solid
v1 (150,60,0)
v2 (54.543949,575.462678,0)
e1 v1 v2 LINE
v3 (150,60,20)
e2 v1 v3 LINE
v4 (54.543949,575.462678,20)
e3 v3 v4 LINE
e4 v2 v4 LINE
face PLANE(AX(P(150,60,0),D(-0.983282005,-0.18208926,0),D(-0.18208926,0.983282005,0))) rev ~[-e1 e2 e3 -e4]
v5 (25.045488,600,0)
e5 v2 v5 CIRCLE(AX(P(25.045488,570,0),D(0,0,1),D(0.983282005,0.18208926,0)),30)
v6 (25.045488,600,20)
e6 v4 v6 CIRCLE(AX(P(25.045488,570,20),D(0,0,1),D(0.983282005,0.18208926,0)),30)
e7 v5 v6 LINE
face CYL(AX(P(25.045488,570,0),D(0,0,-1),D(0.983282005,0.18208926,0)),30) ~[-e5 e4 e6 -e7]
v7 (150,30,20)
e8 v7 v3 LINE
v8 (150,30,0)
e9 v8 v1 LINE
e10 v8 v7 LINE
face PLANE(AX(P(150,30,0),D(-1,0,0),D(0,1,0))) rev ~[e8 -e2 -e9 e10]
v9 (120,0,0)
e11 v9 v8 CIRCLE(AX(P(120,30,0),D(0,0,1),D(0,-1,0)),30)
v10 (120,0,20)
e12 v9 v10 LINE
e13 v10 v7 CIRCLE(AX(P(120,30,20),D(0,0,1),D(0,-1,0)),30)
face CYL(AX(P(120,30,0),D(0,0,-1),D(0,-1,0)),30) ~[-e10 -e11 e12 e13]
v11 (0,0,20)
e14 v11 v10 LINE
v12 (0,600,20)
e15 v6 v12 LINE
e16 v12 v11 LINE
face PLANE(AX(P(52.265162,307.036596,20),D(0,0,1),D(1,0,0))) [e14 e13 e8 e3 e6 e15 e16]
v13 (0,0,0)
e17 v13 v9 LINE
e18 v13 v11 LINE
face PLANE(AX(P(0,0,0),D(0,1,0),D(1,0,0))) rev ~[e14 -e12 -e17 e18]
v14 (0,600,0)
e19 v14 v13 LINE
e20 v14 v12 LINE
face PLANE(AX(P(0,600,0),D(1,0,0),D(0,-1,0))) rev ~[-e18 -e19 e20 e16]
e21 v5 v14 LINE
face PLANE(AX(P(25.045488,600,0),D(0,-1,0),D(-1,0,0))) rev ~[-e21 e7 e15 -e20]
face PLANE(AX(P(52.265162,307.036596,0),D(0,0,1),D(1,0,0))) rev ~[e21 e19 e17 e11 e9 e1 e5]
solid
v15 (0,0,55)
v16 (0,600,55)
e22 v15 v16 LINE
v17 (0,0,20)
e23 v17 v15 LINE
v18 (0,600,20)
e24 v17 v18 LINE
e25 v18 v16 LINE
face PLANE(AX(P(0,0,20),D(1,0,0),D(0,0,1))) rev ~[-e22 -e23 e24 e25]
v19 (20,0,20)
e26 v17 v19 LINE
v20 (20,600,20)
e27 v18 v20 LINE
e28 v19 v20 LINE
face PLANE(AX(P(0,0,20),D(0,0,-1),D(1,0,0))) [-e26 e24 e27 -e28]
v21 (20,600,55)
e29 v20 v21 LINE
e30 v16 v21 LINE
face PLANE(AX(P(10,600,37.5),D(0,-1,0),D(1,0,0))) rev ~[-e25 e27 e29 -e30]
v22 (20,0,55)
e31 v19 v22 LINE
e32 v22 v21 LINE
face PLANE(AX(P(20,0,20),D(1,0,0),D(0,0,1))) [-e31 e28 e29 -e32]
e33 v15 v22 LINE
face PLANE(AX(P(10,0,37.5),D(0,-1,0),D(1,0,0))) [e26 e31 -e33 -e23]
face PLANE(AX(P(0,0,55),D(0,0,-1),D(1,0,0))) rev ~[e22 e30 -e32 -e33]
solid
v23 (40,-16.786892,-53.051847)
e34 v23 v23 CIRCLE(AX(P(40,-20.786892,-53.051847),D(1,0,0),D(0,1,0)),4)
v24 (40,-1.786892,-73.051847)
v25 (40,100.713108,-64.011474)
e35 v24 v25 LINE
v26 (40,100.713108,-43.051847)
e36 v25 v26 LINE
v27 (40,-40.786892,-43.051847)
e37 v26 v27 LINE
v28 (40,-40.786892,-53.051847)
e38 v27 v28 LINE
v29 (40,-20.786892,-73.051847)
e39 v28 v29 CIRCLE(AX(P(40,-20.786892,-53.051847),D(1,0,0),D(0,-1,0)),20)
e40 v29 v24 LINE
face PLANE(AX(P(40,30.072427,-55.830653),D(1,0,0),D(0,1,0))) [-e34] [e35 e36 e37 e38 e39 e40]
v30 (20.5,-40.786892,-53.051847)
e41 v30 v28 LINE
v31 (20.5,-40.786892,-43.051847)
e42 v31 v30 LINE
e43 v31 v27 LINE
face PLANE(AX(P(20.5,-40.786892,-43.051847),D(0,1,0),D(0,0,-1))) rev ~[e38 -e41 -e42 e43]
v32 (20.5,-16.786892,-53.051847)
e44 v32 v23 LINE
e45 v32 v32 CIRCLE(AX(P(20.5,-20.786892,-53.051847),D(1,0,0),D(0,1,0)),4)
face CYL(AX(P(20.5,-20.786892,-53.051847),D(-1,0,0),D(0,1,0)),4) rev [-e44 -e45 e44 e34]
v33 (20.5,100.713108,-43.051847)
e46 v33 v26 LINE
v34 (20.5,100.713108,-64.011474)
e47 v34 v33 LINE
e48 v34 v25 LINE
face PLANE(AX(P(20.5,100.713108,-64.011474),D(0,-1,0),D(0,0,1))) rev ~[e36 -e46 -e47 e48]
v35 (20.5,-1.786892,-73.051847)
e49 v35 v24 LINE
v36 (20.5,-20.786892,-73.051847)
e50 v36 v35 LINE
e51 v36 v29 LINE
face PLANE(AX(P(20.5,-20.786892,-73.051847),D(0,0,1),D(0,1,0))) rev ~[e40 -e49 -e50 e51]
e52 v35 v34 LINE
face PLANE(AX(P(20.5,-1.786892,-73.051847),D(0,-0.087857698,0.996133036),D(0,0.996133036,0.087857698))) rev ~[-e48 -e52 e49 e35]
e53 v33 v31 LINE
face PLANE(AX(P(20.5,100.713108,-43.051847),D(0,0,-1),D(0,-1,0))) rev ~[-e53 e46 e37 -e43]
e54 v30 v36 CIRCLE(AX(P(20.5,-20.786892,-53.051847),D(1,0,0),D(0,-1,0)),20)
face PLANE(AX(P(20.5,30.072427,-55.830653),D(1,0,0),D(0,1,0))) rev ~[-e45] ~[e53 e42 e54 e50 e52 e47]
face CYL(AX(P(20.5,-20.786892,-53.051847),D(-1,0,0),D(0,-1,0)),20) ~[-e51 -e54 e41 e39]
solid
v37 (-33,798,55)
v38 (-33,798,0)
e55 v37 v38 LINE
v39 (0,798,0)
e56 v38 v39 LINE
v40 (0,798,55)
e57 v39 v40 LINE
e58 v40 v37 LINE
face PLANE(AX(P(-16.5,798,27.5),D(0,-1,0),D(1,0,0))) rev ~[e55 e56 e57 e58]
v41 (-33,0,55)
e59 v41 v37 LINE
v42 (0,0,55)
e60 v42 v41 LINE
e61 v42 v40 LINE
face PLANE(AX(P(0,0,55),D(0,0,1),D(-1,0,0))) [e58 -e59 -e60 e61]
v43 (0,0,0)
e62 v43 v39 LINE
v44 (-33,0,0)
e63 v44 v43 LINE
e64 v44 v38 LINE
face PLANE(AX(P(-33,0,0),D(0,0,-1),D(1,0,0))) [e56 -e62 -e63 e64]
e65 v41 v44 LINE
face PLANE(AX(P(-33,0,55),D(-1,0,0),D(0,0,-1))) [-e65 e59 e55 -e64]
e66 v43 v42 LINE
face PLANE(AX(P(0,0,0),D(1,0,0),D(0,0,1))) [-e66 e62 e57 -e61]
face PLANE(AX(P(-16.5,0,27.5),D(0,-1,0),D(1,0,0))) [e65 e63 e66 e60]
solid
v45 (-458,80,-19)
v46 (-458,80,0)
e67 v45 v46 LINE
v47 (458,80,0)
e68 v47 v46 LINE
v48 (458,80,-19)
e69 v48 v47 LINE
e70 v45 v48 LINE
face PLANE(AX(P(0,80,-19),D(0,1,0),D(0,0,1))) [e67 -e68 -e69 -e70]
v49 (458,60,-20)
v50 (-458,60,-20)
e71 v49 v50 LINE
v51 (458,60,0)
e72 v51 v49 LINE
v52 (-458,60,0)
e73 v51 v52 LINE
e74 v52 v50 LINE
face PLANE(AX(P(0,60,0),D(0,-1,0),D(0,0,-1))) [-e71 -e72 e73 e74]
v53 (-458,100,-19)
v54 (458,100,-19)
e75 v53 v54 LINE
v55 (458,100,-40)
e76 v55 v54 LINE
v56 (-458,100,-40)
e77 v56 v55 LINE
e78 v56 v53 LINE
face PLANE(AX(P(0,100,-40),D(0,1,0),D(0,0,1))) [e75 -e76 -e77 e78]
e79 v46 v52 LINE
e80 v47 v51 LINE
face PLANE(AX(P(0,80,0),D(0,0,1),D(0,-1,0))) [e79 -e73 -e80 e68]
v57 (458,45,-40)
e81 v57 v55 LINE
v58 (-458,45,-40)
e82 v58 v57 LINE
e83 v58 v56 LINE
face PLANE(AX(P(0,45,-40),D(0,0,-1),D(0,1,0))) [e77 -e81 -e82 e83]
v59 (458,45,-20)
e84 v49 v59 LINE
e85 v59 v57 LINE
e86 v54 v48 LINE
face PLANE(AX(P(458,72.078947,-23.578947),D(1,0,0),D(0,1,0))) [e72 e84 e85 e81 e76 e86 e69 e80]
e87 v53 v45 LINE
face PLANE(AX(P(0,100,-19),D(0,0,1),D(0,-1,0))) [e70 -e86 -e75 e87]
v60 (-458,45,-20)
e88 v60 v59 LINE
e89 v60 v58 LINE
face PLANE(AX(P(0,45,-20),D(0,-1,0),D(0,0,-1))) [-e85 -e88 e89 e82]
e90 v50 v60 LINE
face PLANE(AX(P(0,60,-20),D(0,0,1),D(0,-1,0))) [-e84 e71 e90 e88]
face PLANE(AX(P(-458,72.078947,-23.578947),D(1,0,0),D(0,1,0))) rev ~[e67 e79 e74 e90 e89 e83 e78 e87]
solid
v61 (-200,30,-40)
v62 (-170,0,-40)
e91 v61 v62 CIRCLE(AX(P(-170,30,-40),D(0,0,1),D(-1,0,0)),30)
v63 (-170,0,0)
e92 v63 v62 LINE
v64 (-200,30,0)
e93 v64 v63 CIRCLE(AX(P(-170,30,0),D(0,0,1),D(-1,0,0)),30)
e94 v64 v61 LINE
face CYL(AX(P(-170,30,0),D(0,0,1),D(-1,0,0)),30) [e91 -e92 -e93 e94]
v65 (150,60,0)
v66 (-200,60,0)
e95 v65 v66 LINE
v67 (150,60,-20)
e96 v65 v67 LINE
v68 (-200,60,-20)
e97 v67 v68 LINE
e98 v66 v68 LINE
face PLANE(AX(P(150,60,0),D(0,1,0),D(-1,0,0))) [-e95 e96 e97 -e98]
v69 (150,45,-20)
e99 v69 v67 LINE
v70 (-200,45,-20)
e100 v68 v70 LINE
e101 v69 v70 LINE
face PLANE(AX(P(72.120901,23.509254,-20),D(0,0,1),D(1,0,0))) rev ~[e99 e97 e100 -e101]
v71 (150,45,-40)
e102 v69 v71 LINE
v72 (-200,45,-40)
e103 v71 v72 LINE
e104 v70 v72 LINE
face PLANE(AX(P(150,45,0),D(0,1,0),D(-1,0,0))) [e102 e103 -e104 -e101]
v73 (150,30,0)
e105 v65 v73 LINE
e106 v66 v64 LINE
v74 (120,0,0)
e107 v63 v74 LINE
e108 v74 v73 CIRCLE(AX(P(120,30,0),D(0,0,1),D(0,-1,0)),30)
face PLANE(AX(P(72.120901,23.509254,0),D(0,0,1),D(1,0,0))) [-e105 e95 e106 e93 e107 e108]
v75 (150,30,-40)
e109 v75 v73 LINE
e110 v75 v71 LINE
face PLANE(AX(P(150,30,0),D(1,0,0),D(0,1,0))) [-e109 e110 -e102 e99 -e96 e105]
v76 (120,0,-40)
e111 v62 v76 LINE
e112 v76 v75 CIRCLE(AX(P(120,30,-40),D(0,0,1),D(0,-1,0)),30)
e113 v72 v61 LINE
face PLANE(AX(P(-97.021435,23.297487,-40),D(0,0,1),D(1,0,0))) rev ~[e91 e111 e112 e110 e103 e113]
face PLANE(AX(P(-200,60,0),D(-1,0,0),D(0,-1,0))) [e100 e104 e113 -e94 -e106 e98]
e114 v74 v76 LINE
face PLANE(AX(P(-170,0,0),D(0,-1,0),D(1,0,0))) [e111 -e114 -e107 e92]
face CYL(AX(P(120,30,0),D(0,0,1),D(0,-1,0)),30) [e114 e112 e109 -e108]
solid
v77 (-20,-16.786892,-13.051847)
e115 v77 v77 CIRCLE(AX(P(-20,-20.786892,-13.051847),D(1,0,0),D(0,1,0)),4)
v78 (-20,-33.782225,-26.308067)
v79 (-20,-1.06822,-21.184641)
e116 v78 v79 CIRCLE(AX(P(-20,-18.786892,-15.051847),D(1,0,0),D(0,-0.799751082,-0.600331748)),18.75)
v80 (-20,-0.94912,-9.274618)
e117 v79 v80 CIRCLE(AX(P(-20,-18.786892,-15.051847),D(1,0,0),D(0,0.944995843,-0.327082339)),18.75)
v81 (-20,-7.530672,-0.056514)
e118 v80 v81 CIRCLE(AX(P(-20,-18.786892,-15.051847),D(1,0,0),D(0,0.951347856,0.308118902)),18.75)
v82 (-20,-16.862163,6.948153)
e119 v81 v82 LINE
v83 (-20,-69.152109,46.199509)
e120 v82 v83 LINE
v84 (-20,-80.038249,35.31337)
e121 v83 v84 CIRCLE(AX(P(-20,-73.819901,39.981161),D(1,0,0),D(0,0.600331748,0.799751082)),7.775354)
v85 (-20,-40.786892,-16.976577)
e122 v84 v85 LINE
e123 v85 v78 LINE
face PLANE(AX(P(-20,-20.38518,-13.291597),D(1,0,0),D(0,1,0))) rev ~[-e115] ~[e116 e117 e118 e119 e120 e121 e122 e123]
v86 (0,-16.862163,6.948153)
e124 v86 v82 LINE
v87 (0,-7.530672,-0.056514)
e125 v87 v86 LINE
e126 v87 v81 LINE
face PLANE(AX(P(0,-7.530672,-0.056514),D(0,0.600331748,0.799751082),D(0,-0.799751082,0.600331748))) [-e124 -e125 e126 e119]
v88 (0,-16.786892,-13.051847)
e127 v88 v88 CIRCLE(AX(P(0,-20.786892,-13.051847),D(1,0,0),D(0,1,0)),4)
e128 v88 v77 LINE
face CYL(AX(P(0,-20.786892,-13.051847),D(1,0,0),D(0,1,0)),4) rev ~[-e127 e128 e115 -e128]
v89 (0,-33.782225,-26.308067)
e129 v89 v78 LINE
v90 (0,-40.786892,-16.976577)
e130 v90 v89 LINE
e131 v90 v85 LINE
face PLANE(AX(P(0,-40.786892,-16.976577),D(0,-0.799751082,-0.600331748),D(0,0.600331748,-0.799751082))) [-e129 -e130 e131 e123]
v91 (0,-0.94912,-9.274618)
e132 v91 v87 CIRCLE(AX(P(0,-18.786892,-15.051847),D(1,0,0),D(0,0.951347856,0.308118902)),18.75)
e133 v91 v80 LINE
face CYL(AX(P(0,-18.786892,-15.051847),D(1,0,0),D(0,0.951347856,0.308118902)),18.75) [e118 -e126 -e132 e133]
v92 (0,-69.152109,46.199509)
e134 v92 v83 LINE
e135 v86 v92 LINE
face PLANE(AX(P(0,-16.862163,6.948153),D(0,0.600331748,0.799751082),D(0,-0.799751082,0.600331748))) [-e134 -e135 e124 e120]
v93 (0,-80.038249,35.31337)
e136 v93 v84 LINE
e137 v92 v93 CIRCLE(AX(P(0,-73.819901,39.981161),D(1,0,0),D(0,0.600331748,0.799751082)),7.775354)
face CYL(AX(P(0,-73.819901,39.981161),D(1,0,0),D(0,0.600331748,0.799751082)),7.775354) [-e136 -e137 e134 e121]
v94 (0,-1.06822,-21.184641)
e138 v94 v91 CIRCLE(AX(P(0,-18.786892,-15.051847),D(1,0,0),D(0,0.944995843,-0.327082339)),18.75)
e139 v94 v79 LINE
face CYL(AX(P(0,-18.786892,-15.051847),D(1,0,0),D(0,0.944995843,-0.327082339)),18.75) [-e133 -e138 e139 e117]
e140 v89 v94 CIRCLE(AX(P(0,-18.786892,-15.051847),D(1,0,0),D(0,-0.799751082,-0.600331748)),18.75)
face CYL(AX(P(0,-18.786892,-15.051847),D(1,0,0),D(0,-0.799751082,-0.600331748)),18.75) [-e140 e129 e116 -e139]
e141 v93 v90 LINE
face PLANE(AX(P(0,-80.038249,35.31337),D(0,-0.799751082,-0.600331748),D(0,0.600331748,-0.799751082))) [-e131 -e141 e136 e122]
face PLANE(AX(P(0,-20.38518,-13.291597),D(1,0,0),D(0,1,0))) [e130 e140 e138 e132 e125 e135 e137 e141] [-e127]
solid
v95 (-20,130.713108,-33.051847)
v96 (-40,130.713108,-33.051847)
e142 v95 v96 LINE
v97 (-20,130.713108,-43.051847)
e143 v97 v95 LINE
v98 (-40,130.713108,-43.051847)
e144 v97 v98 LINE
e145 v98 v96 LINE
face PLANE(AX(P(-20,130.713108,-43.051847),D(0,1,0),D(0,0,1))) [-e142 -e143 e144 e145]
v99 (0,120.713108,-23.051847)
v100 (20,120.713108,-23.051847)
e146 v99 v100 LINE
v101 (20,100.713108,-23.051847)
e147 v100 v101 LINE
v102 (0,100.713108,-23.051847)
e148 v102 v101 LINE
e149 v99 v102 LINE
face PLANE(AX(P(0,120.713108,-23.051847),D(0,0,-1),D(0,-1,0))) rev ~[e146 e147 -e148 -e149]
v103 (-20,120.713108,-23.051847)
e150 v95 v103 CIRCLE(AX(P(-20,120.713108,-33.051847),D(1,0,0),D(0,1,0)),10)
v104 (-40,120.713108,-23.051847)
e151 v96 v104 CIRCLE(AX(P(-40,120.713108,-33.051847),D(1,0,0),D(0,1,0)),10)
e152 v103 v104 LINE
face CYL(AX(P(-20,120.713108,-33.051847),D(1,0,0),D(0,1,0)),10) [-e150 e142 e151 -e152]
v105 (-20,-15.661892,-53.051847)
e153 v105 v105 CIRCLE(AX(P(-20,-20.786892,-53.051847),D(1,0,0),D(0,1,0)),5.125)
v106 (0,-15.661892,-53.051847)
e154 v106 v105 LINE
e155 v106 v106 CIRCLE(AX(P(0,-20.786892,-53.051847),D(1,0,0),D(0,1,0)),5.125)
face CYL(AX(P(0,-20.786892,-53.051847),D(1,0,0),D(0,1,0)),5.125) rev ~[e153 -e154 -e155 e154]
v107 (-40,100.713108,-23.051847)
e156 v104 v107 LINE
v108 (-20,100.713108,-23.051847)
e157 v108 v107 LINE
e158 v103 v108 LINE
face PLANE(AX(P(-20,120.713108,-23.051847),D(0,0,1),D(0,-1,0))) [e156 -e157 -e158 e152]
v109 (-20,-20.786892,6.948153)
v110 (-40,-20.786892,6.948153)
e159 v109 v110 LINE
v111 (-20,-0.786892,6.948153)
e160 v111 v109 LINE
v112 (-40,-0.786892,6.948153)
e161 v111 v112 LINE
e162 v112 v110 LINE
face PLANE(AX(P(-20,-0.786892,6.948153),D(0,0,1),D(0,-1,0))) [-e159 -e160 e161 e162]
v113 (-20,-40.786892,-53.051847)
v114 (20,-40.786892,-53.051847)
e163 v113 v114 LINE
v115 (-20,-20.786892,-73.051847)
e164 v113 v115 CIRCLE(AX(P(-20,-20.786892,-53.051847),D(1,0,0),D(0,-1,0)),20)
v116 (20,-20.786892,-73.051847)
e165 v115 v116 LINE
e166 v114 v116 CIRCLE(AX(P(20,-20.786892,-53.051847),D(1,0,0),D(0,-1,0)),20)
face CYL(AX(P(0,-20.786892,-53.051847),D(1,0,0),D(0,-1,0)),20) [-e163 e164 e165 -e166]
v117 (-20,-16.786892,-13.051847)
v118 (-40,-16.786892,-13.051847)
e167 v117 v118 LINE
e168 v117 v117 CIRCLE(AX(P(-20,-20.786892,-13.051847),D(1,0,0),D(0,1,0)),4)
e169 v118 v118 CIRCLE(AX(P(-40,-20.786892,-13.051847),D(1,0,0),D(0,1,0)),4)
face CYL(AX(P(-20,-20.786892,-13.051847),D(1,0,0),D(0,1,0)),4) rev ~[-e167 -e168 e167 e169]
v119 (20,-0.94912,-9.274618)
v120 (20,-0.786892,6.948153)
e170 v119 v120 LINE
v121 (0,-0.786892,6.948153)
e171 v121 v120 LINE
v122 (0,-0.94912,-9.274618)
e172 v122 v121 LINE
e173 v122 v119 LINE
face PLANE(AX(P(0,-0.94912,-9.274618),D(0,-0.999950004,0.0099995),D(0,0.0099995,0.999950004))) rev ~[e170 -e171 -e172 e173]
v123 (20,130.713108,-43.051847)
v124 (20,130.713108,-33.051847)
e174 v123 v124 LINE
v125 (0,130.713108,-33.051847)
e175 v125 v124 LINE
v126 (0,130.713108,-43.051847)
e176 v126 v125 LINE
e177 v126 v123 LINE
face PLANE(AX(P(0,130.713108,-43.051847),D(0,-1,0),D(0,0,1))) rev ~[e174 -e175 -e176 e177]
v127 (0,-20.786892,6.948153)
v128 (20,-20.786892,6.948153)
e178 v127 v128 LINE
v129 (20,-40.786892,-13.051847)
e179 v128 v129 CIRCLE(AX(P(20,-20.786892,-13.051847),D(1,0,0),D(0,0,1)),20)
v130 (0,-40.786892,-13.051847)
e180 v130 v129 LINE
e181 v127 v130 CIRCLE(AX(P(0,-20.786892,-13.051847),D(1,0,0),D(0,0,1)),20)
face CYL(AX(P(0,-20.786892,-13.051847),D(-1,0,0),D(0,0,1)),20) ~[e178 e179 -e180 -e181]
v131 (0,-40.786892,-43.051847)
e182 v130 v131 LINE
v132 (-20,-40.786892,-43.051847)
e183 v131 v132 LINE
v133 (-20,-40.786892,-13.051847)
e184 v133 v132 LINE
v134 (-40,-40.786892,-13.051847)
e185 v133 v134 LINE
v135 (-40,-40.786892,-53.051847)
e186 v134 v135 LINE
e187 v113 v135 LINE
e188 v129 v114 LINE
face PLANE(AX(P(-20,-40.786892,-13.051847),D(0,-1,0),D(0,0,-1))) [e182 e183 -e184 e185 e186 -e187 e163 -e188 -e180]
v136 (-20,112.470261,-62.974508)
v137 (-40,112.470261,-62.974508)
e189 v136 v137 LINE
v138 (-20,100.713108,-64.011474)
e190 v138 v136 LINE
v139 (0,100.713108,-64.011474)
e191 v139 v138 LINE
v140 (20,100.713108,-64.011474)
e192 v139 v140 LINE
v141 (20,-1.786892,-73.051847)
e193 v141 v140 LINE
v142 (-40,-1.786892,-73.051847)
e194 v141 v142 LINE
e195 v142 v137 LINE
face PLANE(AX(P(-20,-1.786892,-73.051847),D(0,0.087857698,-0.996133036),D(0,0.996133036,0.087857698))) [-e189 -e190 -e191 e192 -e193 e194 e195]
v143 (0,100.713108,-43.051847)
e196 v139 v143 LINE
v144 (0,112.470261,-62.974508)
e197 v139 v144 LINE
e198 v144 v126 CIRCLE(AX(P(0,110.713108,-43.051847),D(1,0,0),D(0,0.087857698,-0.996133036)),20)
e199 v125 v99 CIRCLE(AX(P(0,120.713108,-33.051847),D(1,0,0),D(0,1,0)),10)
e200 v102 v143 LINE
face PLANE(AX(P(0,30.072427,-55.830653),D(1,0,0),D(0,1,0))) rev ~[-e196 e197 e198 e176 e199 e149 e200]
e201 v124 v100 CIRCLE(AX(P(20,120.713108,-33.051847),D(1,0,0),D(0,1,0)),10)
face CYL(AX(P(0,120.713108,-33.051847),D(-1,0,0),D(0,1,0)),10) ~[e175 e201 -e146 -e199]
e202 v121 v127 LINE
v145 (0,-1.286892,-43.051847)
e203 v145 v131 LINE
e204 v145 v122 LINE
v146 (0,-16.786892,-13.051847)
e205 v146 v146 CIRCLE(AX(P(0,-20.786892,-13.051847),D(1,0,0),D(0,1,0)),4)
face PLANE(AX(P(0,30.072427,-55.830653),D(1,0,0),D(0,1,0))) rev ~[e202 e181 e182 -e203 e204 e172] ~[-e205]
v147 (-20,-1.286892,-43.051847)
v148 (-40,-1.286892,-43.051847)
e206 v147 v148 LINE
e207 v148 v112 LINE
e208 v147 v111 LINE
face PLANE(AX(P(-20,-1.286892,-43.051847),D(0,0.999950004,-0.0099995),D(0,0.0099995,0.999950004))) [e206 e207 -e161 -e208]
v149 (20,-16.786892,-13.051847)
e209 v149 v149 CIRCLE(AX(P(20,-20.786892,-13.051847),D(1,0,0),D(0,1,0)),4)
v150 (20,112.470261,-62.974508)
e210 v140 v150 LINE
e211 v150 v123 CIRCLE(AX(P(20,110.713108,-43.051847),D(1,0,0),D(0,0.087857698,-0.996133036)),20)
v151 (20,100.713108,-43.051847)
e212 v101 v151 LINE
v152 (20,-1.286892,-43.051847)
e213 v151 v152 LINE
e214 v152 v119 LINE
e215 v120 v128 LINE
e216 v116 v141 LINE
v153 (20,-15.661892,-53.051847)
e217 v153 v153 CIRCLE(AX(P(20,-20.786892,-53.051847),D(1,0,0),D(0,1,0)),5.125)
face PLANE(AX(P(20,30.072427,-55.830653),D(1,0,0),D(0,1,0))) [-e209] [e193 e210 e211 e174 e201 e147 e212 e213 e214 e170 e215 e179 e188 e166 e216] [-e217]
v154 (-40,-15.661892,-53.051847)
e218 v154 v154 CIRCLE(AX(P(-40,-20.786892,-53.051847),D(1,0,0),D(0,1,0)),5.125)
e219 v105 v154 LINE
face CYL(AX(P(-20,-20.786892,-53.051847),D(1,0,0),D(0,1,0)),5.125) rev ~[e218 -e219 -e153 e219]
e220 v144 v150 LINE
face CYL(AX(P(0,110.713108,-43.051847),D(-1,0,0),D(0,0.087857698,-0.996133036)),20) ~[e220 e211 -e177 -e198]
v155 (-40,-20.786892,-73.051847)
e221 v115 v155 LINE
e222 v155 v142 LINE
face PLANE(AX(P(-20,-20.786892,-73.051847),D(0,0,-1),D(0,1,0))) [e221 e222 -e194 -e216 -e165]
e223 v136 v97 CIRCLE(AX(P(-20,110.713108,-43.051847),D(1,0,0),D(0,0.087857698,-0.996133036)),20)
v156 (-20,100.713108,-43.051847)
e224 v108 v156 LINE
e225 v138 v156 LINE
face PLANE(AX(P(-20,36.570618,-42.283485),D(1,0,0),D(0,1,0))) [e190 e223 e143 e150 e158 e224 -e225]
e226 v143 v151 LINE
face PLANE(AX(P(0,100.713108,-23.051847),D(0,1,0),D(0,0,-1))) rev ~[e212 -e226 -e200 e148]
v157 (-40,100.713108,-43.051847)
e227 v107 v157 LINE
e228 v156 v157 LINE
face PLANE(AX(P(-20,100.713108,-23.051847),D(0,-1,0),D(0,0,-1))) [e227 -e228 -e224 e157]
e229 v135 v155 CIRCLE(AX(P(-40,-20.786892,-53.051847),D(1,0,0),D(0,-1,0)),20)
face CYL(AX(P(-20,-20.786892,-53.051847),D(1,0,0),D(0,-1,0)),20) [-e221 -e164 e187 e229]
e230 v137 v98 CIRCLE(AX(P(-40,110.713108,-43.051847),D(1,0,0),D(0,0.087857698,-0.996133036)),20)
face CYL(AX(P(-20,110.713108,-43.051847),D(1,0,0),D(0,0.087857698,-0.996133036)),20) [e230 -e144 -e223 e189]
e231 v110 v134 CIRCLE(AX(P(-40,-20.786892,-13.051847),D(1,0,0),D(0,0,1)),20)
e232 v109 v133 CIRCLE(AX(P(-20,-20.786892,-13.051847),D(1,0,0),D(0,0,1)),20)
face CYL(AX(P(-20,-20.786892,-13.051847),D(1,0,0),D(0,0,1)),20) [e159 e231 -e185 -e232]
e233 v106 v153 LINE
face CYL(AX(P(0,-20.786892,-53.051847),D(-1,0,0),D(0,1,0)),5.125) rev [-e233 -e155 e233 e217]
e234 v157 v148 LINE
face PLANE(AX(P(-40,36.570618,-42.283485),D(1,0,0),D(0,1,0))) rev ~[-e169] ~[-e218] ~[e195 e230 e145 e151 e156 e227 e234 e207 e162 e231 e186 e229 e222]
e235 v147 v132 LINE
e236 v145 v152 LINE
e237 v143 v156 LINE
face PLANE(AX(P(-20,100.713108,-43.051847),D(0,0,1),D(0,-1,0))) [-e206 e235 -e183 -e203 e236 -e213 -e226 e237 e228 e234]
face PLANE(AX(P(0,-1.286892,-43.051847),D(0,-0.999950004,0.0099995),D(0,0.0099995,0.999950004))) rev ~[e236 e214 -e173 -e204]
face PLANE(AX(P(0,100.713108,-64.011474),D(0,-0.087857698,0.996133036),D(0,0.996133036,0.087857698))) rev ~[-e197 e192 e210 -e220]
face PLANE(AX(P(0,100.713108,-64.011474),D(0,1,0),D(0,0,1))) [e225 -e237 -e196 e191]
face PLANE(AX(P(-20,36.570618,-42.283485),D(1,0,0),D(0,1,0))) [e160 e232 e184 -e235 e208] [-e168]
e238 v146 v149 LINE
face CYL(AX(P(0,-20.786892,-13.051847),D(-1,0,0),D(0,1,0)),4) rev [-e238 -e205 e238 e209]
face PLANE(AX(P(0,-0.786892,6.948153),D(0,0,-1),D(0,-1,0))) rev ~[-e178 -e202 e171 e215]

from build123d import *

# Parameters (mm, degrees)
F1_DEPTH      = 798
F2_W          = 150
F2_H          = 15
F3_DEPTH      = 20
F0_W          = 20
F0_H          = 35
F4_DEPTH      = 600
F2_W_2        = 200
F5_DEPTH      = 20
F6_DEPTH      = 40
F8_DEPTH      = 458
F8_DEPTH_BACK = 458
F7_R          = 5.125
F7_R_2        = 4
F9_DEPTH      = 20
F10_DEPTH     = 20
F11_START     = -40
F9_FACE_R     = 5.125
F9_FACE_R_2   = 4
F11_DEPTH     = 20
F12_DEPTH     = 20
F13_START     = 20.5
F13_DEPTH     = 19.5


with BuildPart() as f1:
    # F0 (on Front) → F1 (new body)
    with BuildSketch(Plane.XZ):
        Polygon((-33, 0), (0, 0), (0, 20), (0, 55), (-33, 55), align=None)
    extrude(amount=-F1_DEPTH)


with BuildPart() as f3:
    # F2 (on Top) → F3 (new body)
    with BuildSketch(Plane.XY):
        with BuildLine():
            Line((0, 600), (0, 60))
            Line((0, 60), (150, 60))
            Line((150, 60), (54.5439485545, 575.4626778055))
            ThreePointArc((54.5439485545, 575.4626778055), (44.2303739381, 593.0638281099), (25.045488405, 600))
            Line((25.045488405, 600), (0, 600))
        make_face()
        with BuildLine():
            Line((0, 45), (0, 0))
            Line((0, 0), (120, 0))
            ThreePointArc((120, 0), (141.2132034356, 8.7867965644), (150, 30))
            Line((150, 30), (150, 45))
            Line((150, 45), (0, 45))
        make_face()
        with Locations((75, 52.5)):
            Rectangle(F2_W, F2_H)
    extrude(amount=F3_DEPTH)


with BuildPart() as f4:
    # F0 (on Front) → F4 (new body, through all)
    with BuildSketch(Plane.XZ):
        with Locations((10, 37.5)):
            Rectangle(F0_W, F0_H)
    extrude(amount=-F4_DEPTH)


with BuildPart() as f5:
    # F2 (on Top) → F5 (new body)
    with BuildSketch(Plane.XY):
        with BuildLine():
            Line((0, 45), (0, 0))
            Line((0, 0), (120, 0))
            ThreePointArc((120, 0), (141.2132034356, 8.7867965644), (150, 30))
            Line((150, 30), (150, 45))
            Line((150, 45), (0, 45))
        make_face()
        with BuildLine():
            Line((-170, 0), (0, 0))
            Line((0, 0), (0, 45))
            Line((0, 45), (-200, 45))
            Line((-200, 45), (-200, 30))
            ThreePointArc((-200, 30), (-191.2132034356, 8.7867965644), (-170, 0))
        make_face()
        with Locations((-100, 52.5)):
            Rectangle(F2_W_2, F2_H)
        with Locations((75, 52.5)):
            Rectangle(F2_W, F2_H)
    extrude(amount=-F5_DEPTH)

    # F2 (on Top) → F6 (join)
    with BuildSketch(Plane.XY):
        with BuildLine():
            Line((-170, 0), (0, 0))
            Line((0, 0), (0, 45))
            Line((0, 45), (-200, 45))
            Line((-200, 45), (-200, 30))
            ThreePointArc((-200, 30), (-191.2132034356, 8.7867965644), (-170, 0))
        make_face()
        with BuildLine():
            Line((0, 45), (0, 0))
            Line((0, 0), (120, 0))
            ThreePointArc((120, 0), (141.2132034356, 8.7867965644), (150, 30))
            Line((150, 30), (150, 45))
            Line((150, 45), (0, 45))
        make_face()
    extrude(amount=-F6_DEPTH)


with BuildPart() as f8:
    # F7 (on Right) → F8 (new body, two sides)
    with BuildSketch(Plane.YZ) as f8_sk:
        Polygon((60, -20), (45, -20), (45, -40), (100, -40), (100, -19), (80, -19), (80, 0), (60, 0), align=None)
    extrude(amount=F8_DEPTH)
    extrude(f8_sk.sketch, amount=-F8_DEPTH_BACK)


with BuildPart() as f9:
    # F7 (on Right) → F9 (new body)
    with BuildSketch(Plane.YZ):
        with BuildLine():
            Line((100.7131075272, -43.0518470941), (-1.2868924728, -43.0518470941))
            Line((-1.2868924728, -43.0518470941), (-40.7868924728, -43.0518470941))
            Line((-40.7868924728, -43.0518470941), (-40.7868924728, -53.0518470941))
            ThreePointArc((-40.7868924728, -53.0518470941), (-34.9290280966, -67.1939827178), (-20.7868924728, -73.0518470941))
            Line((-20.7868924728, -73.0518470941), (-1.7868924728, -73.0518470941))
            Line((-1.7868924728, -73.0518470941), (100.7131075272, -64.0114742078))
            Line((100.7131075272, -64.0114742078), (100.7131075272, -43.0518470941))
        make_face()
        with Locations((-20.7868924728, -53.0518470941)):
            Circle(F7_R, mode=Mode.SUBTRACT)
        with BuildLine():
            ThreePointArc((-33.7822252527, -26.3080673665), (-15.8857687606, -33.5760469744), (-1.0682204113, -21.1846409416))
            Line((-1.0682204113, -21.1846409416), (-0.9491201788, -9.2746176901))
            ThreePointArc((-0.9491201788, -9.2746176901), (-3.5271920064, -4.1567086519), (-7.5306722004, -0.0565143142))
            Line((-7.5306722004, -0.0565143142), (-16.862163006, 6.9481529059))
            Line((-16.862163006, 6.9481529059), (-20.7868924728, 6.9481529059))
            ThreePointArc((-20.7868924728, 6.9481529059), (-34.9290280966, 1.0902885296), (-40.7868924728, -13.0518470941))
            Line((-40.7868924728, -13.0518470941), (-40.7868924728, -16.9765765609))
            Line((-40.7868924728, -16.9765765609), (-33.7822252527, -26.3080673665))
        make_face()
        with Locations((-20.7868924728, -13.0518470941)):
            Circle(F7_R_2, mode=Mode.SUBTRACT)
        with BuildLine():
            ThreePointArc((-7.5306722004, -0.0565143142), (-3.5271920064, -4.1567086519), (-0.9491201788, -9.2746176901))
            Line((-0.9491201788, -9.2746176901), (-0.7868924728, 6.9481529059))
            Line((-0.7868924728, 6.9481529059), (-16.862163006, 6.9481529059))
            Line((-16.862163006, 6.9481529059), (-7.5306722004, -0.0565143142))
        make_face()
        with BuildLine():
            Line((100.7131075272, -23.0518470941), (100.7131075272, -43.0518470941))
            Line((100.7131075272, -43.0518470941), (100.7131075272, -64.0114742078))
            Line((100.7131075272, -64.0114742078), (112.4702614954, -62.9745078083))
            ThreePointArc((112.4702614954, -62.9745078083), (125.4634139539, -56.5584551182), (130.7131075272, -43.0518470941))
            Line((130.7131075272, -43.0518470941), (130.7131075272, -33.0518470941))
            ThreePointArc((130.7131075272, -33.0518470941), (127.784175339, -25.9807792822), (120.7131075272, -23.0518470941))
            Line((120.7131075272, -23.0518470941), (100.7131075272, -23.0518470941))
        make_face()
        with BuildLine():
            Line((-40.7868924728, -43.0518470941), (-1.2868924728, -43.0518470941))
            Line((-1.2868924728, -43.0518470941), (-1.0682204113, -21.1846409416))
            ThreePointArc((-1.0682204113, -21.1846409416), (-15.8857687606, -33.5760469744), (-33.7822252527, -26.3080673665))
            Line((-33.7822252527, -26.3080673665), (-40.7868924728, -16.9765765609))
            Line((-40.7868924728, -16.9765765609), (-40.7868924728, -43.0518470941))
        make_face()
    extrude(amount=F9_DEPTH)

    # F7 (on Right) → F10 (join)
    with BuildSketch(Plane.YZ):
        with BuildLine():
            Line((100.7131075272, -43.0518470941), (-1.2868924728, -43.0518470941))
            Line((-1.2868924728, -43.0518470941), (-40.7868924728, -43.0518470941))
            Line((-40.7868924728, -43.0518470941), (-40.7868924728, -53.0518470941))
            ThreePointArc((-40.7868924728, -53.0518470941), (-34.9290280966, -67.1939827178), (-20.7868924728, -73.0518470941))
            Line((-20.7868924728, -73.0518470941), (-1.7868924728, -73.0518470941))
            Line((-1.7868924728, -73.0518470941), (100.7131075272, -64.0114742078))
            Line((100.7131075272, -64.0114742078), (100.7131075272, -43.0518470941))
        make_face()
        with Locations((-20.7868924728, -53.0518470941)):
            Circle(F7_R, mode=Mode.SUBTRACT)
    extrude(amount=-F10_DEPTH)

    # F9_face (on face) → F11 (join)
    with BuildSketch(Plane(origin=(20, 28.8911192498, -43.4988944495), x_dir=(0, 1, 0), z_dir=(1, 0, 0)).offset(F11_START)):
        with BuildLine():
            Line((-30.6780117226, -29.5529526446), (83.5791422456, -19.4756133588))
            ThreePointArc((83.5791422456, -19.4756133588), (96.5722947041, -13.0595606688), (101.8219882774, 0.4470473554))
            Line((101.8219882774, 0.4470473554), (101.8219882774, 10.4470473554))
            ThreePointArc((101.8219882774, 10.4470473554), (98.8930560892, 17.5181151673), (91.8219882774, 20.4470473554))
            Line((91.8219882774, 20.4470473554), (71.8219882774, 20.4470473554))
            Line((71.8219882774, 20.4470473554), (71.8219882774, 0.4470473554))
            Line((71.8219882774, 0.4470473554), (-30.1780117226, 0.4470473554))
            Line((-30.1780117226, 0.4470473554), (-29.6780117226, 50.4470473554))
            Line((-29.6780117226, 50.4470473554), (-49.6780117226, 50.4470473554))
            ThreePointArc((-49.6780117226, 50.4470473554), (-63.8201473463, 44.5891829791), (-69.6780117226, 30.4470473554))
            Line((-69.6780117226, 30.4470473554), (-69.6780117226, -9.5529526446))
            ThreePointArc((-69.6780117226, -9.5529526446), (-63.8201473463, -23.6950882683), (-49.6780117226, -29.5529526446))
            Line((-49.6780117226, -29.5529526446), (-30.6780117226, -29.5529526446))
        make_face()
        with Locations((-49.6780117226, -9.5529526446)):
            Circle(F9_FACE_R, mode=Mode.SUBTRACT)
        with Locations((-49.6780117226, 30.4470473554)):
            Circle(F9_FACE_R_2, mode=Mode.SUBTRACT)
    extrude(amount=-F11_DEPTH)


with BuildPart() as f12:
    # F7 (on Right) → F12 (new body)
    with BuildSketch(Plane.YZ):
        with BuildLine():
            ThreePointArc((-33.7822252527, -26.3080673665), (-15.8857687606, -33.5760469744), (-1.0682204113, -21.1846409416))
            Line((-1.0682204113, -21.1846409416), (-0.9491201788, -9.2746176901))
            ThreePointArc((-0.9491201788, -9.2746176901), (-3.5271920064, -4.1567086519), (-7.5306722004, -0.0565143142))
            Line((-7.5306722004, -0.0565143142), (-16.862163006, 6.9481529059))
            Line((-16.862163006, 6.9481529059), (-20.7868924728, 6.9481529059))
            ThreePointArc((-20.7868924728, 6.9481529059), (-34.9290280966, 1.0902885296), (-40.7868924728, -13.0518470941))
            Line((-40.7868924728, -13.0518470941), (-40.7868924728, -16.9765765609))
            Line((-40.7868924728, -16.9765765609), (-33.7822252527, -26.3080673665))
        make_face()
        with Locations((-20.7868924728, -13.0518470941)):
            Circle(F7_R_2, mode=Mode.SUBTRACT)
        with BuildLine():
            Line((-80.0382489084, 35.3133695813), (-40.7868924728, -16.9765765609))
            Line((-40.7868924728, -16.9765765609), (-40.7868924728, -13.0518470941))
            ThreePointArc((-40.7868924728, -13.0518470941), (-34.9290280966, 1.0902885296), (-20.7868924728, 6.9481529059))
            Line((-20.7868924728, 6.9481529059), (-16.862163006, 6.9481529059))
            Line((-16.862163006, 6.9481529059), (-69.1521091483, 46.1995093414))
            ThreePointArc((-69.1521091483, 46.1995093414), (-79.3179066679, 45.479167101), (-80.0382489084, 35.3133695813))
        make_face()
        with BuildLine():
            Line((-0.9491201788, -9.2746176901), (-1.0682204113, -21.1846409416))
            ThreePointArc((-1.0682204113, -21.1846409416), (-0.0378299025, -15.2393377198), (-0.9491201788, -9.2746176901))
        make_face()
    extrude(amount=-F12_DEPTH)


with BuildPart() as f13:
    # F7 (on Right) → F13 (new body)
    with BuildSketch(Plane.YZ.offset(F13_START)):
        with BuildLine():
            Line((100.7131075272, -43.0518470941), (-1.2868924728, -43.0518470941))
            Line((-1.2868924728, -43.0518470941), (-40.7868924728, -43.0518470941))
            Line((-40.7868924728, -43.0518470941), (-40.7868924728, -53.0518470941))
            ThreePointArc((-40.7868924728, -53.0518470941), (-34.9290280966, -67.1939827178), (-20.7868924728, -73.0518470941))
            Line((-20.7868924728, -73.0518470941), (-1.7868924728, -73.0518470941))
            Line((-1.7868924728, -73.0518470941), (100.7131075272, -64.0114742078))
            Line((100.7131075272, -64.0114742078), (100.7131075272, -43.0518470941))
        make_face()
        with Locations((-20.7868924728, -53.0518470941)):
            Circle(F7_R, mode=Mode.SUBTRACT)
        with Locations((-20.7868924728, -53.0518470941)):
            Circle(F7_R)
        with Locations((-20.7868924728, -53.0518470941)):
            Circle(F7_R_2, mode=Mode.SUBTRACT)
    extrude(amount=F13_DEPTH)


solid = Compound([f1.part, f3.part, f4.part, f5.part, f8.part, f9.part, f12.part, f13.part])
